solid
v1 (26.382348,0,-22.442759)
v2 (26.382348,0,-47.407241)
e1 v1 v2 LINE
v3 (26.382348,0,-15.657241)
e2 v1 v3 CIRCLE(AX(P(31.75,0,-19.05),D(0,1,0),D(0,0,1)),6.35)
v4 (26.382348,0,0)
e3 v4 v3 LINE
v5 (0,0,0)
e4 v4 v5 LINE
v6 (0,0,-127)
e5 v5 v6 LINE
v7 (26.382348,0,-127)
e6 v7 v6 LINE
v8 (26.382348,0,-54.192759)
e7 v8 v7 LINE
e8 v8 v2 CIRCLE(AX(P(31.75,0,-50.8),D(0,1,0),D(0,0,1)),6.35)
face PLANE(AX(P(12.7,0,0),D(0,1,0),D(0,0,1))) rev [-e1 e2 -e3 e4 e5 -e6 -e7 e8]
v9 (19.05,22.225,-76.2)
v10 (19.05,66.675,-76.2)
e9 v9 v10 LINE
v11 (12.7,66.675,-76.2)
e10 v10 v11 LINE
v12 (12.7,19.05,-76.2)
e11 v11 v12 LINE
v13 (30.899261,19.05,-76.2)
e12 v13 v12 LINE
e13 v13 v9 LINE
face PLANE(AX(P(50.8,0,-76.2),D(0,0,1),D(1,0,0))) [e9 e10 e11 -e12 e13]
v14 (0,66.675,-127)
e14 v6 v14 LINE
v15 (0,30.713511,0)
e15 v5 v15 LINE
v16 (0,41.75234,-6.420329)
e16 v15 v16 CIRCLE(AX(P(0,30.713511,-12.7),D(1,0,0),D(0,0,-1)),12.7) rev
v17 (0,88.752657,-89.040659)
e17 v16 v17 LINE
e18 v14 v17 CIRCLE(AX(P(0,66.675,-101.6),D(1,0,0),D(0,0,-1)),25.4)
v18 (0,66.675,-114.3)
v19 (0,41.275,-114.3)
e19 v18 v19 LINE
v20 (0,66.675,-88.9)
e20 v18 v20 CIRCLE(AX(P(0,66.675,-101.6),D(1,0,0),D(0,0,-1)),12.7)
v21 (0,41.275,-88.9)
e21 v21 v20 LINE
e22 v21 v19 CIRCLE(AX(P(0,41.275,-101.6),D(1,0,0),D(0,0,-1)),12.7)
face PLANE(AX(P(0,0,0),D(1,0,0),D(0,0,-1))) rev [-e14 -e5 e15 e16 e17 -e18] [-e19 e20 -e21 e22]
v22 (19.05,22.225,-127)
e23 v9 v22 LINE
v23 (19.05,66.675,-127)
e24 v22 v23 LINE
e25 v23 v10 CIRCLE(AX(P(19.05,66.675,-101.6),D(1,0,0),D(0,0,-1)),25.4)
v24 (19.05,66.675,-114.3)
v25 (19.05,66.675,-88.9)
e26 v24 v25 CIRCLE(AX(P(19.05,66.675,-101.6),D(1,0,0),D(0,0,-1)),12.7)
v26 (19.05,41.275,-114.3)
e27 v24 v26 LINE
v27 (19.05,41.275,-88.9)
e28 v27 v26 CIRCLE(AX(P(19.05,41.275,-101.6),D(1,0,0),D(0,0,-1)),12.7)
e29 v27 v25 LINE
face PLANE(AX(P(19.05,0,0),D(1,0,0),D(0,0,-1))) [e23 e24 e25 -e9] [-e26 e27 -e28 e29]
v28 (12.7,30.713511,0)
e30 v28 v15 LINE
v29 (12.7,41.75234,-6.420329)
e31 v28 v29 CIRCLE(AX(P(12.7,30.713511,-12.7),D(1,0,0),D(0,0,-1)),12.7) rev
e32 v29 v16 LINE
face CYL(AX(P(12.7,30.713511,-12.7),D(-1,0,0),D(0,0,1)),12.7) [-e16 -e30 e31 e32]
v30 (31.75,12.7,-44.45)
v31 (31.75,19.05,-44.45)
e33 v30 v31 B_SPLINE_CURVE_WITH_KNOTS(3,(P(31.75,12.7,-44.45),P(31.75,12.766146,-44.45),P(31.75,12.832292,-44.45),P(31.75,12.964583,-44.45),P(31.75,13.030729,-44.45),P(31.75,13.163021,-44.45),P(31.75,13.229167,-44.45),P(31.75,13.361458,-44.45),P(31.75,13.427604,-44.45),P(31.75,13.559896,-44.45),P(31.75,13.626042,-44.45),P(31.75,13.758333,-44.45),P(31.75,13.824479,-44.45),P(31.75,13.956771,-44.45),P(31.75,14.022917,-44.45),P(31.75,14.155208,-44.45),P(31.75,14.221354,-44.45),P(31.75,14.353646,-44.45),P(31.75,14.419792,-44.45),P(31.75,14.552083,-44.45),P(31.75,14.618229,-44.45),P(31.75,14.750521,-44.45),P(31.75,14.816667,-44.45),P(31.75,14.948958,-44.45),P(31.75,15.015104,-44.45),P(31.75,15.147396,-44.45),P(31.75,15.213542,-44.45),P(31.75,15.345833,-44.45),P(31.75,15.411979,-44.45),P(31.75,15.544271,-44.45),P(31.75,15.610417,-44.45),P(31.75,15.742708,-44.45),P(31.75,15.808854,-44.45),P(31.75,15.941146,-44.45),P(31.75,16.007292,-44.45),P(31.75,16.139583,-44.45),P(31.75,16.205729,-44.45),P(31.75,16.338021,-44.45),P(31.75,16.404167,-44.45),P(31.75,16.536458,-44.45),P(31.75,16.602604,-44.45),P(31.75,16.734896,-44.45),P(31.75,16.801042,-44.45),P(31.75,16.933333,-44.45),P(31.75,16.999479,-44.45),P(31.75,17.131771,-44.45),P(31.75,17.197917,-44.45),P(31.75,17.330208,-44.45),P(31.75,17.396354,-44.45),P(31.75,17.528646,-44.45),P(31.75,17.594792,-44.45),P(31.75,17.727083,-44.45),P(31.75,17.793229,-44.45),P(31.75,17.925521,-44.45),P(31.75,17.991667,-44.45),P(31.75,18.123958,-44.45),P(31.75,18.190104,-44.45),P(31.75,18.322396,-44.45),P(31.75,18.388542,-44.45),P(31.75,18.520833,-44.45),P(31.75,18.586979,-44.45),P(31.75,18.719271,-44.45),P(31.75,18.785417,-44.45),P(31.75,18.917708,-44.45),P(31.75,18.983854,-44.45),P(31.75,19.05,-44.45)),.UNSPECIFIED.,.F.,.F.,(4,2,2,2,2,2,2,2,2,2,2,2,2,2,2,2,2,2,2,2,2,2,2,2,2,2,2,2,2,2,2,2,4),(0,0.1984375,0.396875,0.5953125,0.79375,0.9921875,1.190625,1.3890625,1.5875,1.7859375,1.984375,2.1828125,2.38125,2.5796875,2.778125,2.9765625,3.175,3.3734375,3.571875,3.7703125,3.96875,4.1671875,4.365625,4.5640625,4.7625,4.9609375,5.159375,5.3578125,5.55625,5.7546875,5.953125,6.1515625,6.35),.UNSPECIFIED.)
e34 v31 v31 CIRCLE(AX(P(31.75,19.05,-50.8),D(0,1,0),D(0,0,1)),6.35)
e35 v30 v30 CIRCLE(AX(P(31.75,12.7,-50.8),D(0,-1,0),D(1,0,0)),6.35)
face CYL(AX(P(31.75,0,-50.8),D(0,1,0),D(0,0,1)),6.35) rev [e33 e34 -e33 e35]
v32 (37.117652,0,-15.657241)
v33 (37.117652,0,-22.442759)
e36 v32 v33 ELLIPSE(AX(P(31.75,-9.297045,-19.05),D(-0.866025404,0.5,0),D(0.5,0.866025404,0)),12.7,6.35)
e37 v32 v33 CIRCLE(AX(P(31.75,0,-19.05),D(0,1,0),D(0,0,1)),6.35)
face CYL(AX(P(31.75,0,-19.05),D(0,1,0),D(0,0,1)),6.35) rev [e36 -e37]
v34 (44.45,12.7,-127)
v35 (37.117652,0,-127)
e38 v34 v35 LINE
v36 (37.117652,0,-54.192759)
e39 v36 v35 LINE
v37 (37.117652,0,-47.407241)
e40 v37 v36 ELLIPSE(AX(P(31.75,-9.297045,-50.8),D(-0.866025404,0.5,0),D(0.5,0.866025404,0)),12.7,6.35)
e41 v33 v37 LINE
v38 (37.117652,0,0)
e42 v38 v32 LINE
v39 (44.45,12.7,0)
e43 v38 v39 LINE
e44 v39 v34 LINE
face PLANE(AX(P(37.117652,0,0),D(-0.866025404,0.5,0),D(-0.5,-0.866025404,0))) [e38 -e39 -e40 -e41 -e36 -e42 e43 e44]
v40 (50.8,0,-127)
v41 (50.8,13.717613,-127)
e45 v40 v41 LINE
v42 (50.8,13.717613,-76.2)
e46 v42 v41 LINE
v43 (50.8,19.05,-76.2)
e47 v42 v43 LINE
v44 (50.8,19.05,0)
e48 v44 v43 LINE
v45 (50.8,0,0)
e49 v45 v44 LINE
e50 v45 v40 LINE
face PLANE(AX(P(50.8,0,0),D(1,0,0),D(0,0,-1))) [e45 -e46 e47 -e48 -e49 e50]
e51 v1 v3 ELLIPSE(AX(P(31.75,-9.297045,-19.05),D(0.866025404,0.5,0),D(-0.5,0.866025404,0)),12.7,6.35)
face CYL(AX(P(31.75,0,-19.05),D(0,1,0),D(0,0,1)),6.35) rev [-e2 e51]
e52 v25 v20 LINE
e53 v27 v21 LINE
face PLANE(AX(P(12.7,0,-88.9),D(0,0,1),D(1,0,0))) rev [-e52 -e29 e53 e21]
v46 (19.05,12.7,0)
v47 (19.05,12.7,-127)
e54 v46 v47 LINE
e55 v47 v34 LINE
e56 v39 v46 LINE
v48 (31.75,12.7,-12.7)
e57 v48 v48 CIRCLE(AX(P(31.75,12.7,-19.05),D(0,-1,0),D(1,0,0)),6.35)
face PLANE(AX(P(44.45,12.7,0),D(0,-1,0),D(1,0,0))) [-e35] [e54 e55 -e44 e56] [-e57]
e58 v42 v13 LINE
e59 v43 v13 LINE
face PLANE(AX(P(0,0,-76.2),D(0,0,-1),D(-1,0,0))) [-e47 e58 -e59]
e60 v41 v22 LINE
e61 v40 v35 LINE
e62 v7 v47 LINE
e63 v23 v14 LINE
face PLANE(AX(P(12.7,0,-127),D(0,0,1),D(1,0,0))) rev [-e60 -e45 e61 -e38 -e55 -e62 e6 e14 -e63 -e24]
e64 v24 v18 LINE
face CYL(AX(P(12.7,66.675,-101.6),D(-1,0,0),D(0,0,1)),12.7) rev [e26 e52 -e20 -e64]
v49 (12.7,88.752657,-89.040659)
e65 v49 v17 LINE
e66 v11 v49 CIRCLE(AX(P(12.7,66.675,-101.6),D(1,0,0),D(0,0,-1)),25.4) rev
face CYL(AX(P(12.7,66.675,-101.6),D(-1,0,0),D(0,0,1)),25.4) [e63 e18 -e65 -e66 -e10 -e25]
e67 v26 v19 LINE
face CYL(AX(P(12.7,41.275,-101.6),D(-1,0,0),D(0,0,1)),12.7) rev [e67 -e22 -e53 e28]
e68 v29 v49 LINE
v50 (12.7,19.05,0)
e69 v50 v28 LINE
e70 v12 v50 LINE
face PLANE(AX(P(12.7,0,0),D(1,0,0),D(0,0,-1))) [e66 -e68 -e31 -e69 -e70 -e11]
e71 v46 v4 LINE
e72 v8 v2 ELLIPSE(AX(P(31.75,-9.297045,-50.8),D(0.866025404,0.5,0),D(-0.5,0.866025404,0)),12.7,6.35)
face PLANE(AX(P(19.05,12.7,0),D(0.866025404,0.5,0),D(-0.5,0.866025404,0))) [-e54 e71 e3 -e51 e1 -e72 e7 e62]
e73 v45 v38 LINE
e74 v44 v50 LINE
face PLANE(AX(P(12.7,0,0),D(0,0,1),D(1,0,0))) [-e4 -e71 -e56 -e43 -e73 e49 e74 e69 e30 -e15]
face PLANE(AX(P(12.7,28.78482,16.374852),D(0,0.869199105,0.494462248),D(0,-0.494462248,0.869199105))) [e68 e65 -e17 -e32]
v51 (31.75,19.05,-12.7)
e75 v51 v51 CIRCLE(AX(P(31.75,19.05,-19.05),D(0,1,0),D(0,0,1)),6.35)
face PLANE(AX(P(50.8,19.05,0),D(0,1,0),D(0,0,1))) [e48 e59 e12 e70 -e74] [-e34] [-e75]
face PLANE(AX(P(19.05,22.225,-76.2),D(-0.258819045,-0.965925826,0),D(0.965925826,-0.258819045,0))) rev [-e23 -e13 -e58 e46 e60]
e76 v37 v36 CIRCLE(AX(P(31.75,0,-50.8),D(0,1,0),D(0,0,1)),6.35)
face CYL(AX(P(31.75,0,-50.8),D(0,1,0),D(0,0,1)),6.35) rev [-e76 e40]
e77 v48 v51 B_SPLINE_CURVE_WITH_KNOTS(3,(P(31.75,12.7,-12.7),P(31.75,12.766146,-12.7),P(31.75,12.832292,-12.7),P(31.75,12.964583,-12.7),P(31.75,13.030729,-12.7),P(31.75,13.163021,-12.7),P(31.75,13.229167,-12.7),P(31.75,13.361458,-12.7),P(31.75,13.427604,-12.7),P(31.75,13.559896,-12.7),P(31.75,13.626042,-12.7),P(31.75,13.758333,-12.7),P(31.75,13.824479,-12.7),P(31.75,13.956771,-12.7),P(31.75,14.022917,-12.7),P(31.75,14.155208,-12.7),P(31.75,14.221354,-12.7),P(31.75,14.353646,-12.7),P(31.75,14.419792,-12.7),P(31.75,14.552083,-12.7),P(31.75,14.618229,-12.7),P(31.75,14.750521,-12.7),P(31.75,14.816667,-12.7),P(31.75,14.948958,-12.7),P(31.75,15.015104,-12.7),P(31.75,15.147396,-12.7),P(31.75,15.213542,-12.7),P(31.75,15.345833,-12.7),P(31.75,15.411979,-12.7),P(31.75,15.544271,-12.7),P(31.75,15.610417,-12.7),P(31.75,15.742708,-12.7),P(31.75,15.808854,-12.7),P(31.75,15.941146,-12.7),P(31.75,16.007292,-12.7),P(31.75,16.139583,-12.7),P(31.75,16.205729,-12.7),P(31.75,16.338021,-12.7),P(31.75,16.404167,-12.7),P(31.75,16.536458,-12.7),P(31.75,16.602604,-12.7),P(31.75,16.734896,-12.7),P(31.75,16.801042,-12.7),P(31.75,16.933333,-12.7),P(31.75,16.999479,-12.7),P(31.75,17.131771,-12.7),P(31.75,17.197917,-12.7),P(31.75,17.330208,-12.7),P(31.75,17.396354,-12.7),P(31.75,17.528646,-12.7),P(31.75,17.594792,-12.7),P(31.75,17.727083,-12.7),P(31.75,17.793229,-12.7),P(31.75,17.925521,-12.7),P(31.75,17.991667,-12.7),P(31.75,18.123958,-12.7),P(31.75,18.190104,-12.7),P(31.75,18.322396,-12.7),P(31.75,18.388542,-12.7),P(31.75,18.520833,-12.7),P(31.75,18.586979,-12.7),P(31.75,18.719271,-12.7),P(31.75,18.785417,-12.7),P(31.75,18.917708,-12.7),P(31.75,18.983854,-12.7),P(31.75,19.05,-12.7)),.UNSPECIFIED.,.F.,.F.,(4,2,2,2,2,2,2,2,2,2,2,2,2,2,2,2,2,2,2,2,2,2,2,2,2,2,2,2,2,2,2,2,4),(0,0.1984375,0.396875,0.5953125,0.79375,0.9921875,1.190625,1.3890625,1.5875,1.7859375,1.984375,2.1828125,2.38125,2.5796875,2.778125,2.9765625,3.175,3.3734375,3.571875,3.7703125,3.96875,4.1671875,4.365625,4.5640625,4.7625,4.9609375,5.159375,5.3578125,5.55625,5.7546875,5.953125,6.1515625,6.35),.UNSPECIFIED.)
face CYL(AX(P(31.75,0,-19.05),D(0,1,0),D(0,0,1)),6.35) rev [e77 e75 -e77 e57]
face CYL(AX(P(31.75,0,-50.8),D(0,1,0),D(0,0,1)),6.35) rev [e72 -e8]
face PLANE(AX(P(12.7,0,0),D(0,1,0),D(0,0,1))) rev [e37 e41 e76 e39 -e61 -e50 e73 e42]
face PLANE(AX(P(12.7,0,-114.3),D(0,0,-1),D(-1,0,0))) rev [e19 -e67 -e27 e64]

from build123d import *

# Parameters (mm, degrees)
BOSS_EXTRUDE1_DEPTH = 12.7
BOSS_EXTRUDE2_DEPTH = 50.8
BOSS_EXTRUDE3_DEPTH = 19.05
CUT_EXTRUDE1_DEPTH  = 165.886159592
SKETCH4_R           = 6.35
CUT_EXTRUDE2_DEPTH  = 156.055766178
CUT_EXTRUDE3_DEPTH  = 50.8


with BuildPart() as part:
    # Sketch1 → Boss-Extrude1 (new body)
    with BuildSketch(Plane(origin=(0, 0, 0), x_dir=(0, 0, -1), z_dir=(1, 0, 0))):
        with BuildLine():
            Line((0, 0), (127, 0))
            Line((127, 0), (127, 66.675))
            ThreePointArc((127, 66.675), (114.370135783, 88.631402986), (89.04065889, 88.752657278))
            Line((89.04065889, 88.752657278), (6.420329445, 41.752339853))
            ThreePointArc((6.420329445, 41.752339853), (1.721798507, 37.098579105), (0, 30.713511214))
            Line((0, 30.713511214), (0, 0))
        make_face()
        with BuildLine():
            Line((88.9, 41.275), (88.9, 66.675))
            ThreePointArc((88.9, 66.675), (101.6, 79.375), (114.3, 66.675))
            Line((114.3, 66.675), (114.3, 41.275))
            ThreePointArc((114.3, 41.275), (101.6, 28.575), (88.9, 41.275))
        make_face(mode=Mode.SUBTRACT)
    extrude(amount=BOSS_EXTRUDE1_DEPTH)

    # Sketch1<3> → Boss-Extrude2 (add)
    with BuildSketch(Plane(origin=(0, 0, 0), x_dir=(0, 0, -1), z_dir=(1, 0, 0))):
        Polygon((0, 19.05), (0, 0), (127, 0), (127, 22.225), (76.2, 22.225), (76.2, 19.05), align=None)
    extrude(amount=BOSS_EXTRUDE2_DEPTH)

    # Sketch1<7> → Boss-Extrude3 (add)
    with BuildSketch(Plane(origin=(0, 0, 0), x_dir=(0, 0, -1), z_dir=(1, 0, 0))):
        with BuildLine():
            Line((76.2, 22.225), (127, 22.225))
            Line((127, 22.225), (127, 66.675))
            ThreePointArc((127, 66.675), (114.370135783, 88.631402986), (89.04065889, 88.752657278))
            ThreePointArc((89.04065889, 88.752657278), (79.643597014, 79.445135783), (76.2, 66.675))
            Line((76.2, 66.675), (76.2, 22.225))
        make_face()
        with BuildLine():
            ThreePointArc((114.3, 41.275), (101.6, 28.575), (88.9, 41.275))
            Line((88.9, 41.275), (88.9, 66.675))
            ThreePointArc((88.9, 66.675), (101.6, 79.375), (114.3, 66.675))
            Line((114.3, 66.675), (114.3, 41.275))
        make_face(mode=Mode.SUBTRACT)
    extrude(amount=BOSS_EXTRUDE3_DEPTH)

    # Sketch3 → Cut-Extrude1 (cut, through all)
    with BuildSketch(Plane.XY):
        Polygon((-67.157348715, -180.609598473), (37.117651581, 0), (44.45, 12.7), (19.05, 12.7), (26.382348419, 0), (130.657348715, -180.609598473), (130.657348715, 236.490402714), (-67.157348715, 236.490402714), align=None)
    extrude(amount=-CUT_EXTRUDE1_DEPTH, mode=Mode.SUBTRACT)

    # Sketch4 → Cut-Extrude2 (cut, through all)
    with BuildSketch(Plane(origin=(0, 19.05, 0), x_dir=(1, 0, 0), z_dir=(0, 1, 0))):
        with Locations((31.75, 19.05)):
            Circle(SKETCH4_R)
        with Locations((31.75, 50.8)):
            Circle(SKETCH4_R)
    extrude(amount=-CUT_EXTRUDE2_DEPTH, mode=Mode.SUBTRACT)

    # Sketch5 → Cut-Extrude3 (cut)
    with BuildSketch(Plane(origin=(0, 0, -127), x_dir=(-1, 0, 0), z_dir=(0, 0, -1))):
        Polygon((-19.05, 22.225), (-50.8, 13.71761314), (-50.8, 22.225), align=None)
    extrude(amount=-CUT_EXTRUDE3_DEPTH, mode=Mode.SUBTRACT)


solid = part.part
